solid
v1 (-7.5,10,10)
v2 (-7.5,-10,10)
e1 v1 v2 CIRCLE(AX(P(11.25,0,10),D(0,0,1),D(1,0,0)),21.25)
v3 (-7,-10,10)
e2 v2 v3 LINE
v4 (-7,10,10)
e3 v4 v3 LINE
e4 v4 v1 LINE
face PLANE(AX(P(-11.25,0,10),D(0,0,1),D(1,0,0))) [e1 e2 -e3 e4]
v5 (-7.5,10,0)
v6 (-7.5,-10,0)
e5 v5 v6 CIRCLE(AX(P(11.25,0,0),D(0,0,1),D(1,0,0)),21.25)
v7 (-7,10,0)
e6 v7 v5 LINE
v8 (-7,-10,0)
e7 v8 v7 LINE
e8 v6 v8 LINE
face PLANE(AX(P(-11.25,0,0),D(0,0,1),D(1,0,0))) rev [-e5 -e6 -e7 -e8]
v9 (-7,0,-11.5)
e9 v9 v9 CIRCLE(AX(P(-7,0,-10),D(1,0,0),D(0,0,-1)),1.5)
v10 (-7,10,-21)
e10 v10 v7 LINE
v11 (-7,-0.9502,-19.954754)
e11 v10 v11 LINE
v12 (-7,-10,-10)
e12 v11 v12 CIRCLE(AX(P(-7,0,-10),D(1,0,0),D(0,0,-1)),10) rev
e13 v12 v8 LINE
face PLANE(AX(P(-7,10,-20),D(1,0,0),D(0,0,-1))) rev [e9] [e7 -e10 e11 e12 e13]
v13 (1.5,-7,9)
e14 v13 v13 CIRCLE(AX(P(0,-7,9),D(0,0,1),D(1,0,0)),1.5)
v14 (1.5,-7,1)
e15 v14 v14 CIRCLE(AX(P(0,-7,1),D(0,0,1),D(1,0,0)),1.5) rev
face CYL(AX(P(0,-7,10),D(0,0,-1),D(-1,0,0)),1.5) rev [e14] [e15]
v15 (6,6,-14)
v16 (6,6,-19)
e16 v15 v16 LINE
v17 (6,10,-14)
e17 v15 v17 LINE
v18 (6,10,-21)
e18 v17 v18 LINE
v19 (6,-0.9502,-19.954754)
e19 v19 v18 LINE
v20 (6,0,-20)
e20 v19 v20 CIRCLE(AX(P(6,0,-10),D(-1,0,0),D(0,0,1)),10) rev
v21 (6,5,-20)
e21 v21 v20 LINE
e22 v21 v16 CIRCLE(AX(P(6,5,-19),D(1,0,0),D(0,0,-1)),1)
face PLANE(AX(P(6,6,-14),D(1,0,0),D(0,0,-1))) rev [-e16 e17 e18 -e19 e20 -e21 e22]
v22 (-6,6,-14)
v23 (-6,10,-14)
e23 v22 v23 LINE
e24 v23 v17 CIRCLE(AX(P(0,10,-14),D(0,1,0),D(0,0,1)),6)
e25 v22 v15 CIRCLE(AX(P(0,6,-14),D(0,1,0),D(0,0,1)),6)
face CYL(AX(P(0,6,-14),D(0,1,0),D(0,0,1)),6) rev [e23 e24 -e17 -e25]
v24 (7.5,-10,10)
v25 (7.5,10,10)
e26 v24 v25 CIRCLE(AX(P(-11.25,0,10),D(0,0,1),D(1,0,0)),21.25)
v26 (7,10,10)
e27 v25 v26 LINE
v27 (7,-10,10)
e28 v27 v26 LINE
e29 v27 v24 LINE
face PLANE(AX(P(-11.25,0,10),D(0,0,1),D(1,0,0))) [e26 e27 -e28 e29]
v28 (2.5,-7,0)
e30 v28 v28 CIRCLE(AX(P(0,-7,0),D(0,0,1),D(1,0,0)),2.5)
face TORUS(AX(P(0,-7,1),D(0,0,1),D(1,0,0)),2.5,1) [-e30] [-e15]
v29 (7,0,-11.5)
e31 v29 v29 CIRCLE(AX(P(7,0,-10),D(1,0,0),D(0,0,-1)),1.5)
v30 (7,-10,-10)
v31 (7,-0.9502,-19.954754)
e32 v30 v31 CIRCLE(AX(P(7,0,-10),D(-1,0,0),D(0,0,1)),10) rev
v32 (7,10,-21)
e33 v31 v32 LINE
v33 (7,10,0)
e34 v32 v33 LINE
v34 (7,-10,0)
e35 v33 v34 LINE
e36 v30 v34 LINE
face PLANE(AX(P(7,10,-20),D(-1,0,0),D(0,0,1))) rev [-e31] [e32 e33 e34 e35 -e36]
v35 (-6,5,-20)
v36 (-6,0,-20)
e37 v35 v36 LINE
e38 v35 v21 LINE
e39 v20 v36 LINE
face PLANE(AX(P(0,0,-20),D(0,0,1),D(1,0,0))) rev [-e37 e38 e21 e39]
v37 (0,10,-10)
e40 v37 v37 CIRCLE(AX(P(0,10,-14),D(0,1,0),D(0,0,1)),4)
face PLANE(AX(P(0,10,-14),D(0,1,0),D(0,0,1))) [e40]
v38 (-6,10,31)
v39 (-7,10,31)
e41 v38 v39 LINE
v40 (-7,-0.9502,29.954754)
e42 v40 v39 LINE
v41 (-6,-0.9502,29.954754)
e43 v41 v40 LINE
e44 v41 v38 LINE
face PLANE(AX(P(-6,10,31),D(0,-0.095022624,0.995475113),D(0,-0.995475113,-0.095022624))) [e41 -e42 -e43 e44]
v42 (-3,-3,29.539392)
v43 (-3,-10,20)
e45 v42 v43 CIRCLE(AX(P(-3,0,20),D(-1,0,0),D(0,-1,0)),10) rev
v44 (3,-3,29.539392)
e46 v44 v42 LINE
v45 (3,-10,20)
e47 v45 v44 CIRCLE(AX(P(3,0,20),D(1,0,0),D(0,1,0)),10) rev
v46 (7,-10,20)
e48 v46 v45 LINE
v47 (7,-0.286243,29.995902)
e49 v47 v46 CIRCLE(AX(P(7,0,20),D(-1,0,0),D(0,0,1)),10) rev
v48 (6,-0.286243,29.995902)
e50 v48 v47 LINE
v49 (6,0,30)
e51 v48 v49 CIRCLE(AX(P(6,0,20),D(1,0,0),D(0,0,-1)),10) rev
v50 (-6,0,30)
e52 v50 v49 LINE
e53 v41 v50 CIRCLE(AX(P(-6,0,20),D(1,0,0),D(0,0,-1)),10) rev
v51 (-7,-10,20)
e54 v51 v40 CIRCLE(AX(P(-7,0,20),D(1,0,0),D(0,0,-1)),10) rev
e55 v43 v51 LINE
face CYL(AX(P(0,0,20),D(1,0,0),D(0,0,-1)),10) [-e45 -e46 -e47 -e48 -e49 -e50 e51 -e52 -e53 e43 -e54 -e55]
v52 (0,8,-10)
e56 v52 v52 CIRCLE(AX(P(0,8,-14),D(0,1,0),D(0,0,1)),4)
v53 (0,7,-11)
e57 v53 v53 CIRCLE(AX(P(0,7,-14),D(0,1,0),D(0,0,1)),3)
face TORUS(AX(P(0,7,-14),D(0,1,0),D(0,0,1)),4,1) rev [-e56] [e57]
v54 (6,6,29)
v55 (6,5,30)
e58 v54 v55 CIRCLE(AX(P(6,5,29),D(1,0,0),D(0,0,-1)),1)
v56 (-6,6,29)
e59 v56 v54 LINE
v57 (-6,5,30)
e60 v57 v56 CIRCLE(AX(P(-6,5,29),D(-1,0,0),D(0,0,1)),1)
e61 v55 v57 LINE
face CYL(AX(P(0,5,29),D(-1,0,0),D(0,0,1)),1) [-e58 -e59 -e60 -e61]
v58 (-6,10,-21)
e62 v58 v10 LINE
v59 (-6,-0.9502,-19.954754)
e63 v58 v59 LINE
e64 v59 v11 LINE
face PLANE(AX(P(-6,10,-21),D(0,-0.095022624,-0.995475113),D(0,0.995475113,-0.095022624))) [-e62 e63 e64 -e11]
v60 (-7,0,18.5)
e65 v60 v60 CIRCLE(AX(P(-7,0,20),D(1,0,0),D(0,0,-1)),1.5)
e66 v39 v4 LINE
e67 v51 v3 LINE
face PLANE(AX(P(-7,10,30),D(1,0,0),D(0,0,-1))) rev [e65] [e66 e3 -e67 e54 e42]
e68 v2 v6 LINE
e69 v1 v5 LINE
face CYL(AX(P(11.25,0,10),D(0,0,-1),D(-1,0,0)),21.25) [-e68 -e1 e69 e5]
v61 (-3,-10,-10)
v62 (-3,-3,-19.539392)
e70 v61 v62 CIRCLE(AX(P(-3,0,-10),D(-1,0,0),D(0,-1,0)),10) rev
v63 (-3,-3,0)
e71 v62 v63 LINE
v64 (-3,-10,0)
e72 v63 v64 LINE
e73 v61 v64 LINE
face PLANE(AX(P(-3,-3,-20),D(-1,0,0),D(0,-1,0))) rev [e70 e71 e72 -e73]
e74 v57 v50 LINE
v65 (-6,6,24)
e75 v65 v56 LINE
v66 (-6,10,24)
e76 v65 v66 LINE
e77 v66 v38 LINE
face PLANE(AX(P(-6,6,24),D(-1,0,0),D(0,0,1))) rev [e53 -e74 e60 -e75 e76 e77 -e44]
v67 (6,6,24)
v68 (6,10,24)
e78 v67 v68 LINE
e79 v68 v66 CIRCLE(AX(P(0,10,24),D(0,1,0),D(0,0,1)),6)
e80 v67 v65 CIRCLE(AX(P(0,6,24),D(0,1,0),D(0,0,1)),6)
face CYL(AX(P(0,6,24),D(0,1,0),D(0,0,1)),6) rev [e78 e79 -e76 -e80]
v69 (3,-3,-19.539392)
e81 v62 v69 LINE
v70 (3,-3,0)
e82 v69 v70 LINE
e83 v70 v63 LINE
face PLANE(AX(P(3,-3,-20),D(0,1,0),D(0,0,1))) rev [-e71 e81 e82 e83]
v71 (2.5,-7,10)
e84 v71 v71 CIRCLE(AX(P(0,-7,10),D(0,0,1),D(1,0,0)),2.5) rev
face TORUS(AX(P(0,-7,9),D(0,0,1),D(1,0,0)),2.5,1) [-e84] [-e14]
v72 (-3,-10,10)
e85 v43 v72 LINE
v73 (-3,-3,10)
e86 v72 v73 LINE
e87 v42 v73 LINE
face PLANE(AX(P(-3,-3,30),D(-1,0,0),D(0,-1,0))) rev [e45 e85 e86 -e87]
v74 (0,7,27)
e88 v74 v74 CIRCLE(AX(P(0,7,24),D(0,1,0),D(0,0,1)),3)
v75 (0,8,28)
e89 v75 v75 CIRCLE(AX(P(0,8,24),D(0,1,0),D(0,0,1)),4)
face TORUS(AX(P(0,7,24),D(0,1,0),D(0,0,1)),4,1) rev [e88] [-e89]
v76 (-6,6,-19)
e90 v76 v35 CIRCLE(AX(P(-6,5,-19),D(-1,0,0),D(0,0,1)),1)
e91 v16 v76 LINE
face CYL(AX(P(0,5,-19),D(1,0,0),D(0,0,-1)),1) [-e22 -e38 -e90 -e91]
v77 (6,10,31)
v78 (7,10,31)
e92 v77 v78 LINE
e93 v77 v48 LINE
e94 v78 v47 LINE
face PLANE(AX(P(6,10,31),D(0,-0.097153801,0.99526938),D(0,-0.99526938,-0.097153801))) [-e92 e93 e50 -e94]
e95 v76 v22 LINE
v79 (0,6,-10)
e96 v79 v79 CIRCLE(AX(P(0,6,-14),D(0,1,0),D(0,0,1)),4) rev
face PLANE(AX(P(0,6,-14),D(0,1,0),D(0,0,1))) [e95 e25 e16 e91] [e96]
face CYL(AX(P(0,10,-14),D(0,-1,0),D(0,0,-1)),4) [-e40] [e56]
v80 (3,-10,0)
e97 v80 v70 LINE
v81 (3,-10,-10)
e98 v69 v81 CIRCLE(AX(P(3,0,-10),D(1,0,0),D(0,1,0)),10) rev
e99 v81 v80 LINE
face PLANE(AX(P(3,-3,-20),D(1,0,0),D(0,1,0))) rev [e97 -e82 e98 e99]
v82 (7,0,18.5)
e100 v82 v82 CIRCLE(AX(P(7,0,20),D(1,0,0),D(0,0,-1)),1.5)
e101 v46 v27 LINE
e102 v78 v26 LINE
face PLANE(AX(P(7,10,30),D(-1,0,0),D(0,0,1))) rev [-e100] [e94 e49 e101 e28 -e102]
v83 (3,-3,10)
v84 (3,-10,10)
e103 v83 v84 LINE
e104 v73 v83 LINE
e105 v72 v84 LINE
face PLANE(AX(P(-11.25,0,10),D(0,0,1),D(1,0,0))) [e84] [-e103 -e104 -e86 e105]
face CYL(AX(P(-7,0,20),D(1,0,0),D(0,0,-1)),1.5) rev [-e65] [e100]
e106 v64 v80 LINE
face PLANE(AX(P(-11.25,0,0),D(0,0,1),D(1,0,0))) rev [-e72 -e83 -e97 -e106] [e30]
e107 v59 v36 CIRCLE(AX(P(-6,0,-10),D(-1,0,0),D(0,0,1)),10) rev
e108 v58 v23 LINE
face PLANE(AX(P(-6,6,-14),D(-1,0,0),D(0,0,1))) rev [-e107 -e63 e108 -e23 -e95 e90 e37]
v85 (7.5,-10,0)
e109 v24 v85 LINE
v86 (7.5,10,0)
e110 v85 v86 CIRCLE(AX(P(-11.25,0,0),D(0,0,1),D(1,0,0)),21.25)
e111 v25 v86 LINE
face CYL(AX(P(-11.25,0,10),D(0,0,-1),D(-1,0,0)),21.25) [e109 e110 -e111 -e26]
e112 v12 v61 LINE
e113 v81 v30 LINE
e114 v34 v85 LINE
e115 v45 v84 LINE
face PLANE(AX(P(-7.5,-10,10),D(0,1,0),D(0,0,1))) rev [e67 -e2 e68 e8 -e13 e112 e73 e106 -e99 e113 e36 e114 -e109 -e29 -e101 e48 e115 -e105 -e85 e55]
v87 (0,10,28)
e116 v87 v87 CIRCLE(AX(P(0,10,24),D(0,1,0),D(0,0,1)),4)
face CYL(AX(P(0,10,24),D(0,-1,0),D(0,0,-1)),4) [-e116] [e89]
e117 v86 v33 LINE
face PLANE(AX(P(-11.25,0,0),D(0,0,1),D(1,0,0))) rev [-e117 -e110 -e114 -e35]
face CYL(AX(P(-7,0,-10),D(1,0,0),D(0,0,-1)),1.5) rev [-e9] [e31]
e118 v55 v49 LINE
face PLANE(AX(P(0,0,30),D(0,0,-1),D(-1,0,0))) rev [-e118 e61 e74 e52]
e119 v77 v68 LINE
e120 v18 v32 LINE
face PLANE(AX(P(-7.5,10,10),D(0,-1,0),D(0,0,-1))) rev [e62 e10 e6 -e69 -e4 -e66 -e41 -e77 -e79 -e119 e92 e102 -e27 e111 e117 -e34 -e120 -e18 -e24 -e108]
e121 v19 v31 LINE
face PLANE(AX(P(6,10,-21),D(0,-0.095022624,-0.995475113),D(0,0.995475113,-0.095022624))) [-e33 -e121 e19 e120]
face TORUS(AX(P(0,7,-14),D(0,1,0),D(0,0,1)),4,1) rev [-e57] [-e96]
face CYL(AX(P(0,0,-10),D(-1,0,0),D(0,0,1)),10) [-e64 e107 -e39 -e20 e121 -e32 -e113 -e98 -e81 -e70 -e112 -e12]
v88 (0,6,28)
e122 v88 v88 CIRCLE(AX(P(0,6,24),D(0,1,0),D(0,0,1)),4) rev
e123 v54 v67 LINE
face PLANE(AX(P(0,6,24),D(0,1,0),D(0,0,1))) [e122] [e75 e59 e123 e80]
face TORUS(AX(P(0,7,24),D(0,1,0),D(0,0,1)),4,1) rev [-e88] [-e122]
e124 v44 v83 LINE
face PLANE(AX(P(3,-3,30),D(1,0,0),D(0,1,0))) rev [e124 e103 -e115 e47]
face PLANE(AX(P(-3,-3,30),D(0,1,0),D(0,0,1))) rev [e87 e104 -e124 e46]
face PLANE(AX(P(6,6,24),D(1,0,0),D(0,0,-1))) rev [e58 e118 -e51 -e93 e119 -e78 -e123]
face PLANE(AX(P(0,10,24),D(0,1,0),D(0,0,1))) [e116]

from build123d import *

# Parameters (mm, degrees)
SALIENTE_EXTRUIR1_DEPTH = 10
CROQUIS3_R              = 1.5
CORTAR_EXTRUIR1_DEPTH   = 10
SALIENTE_EXTRUIR2_DEPTH = 20
SALIENTE_EXTRUIR3_DEPTH = 20
CROQUIS6_R              = 1.5
CORTAR_EXTRUIR2_DEPTH   = 14
REDONDEO1_R             = 10
CUT_EXTRUDE1_DEPTH      = 4
SKETCH2_R               = 3
BOSS_EXTRUDE1_DEPTH     = 2
SKETCH3_R               = 4
BOSS_EXTRUDE2_DEPTH     = 2
FILLET1_R               = 1
FILLET2_R               = 1
FILLET3_R               = 1
BOSS_EXTRUDE3_DEPTH     = 1
BOSS_EXTRUDE4_DEPTH     = 1


with BuildPart() as part:
    # Croquis2 → Saliente-Extruir1 (new body)
    with BuildSketch(Plane.XY):
        with BuildLine():
            Line((-7.5, 10), (7.5, 10))
            ThreePointArc((7.5, 10), (10, 0), (7.5, -10))
            Line((7.5, -10), (-7.5, -10))
            ThreePointArc((-7.5, -10), (-10, 0), (-7.5, 10))
        make_face()
    extrude(amount=SALIENTE_EXTRUIR1_DEPTH)

    # Croquis3 → Cortar-Extruir1 (cut)
    with BuildSketch(Plane(origin=(0, 0, 0), x_dir=(-1, 0, 0), z_dir=(0, 0, -1))):
        with Locations((0, -7)):
            Circle(CROQUIS3_R)
    extrude(amount=-CORTAR_EXTRUIR1_DEPTH, mode=Mode.SUBTRACT)

    # Croquis4 → Saliente-Extruir2 (add)
    with BuildSketch(Plane(origin=(0, 0, 0), x_dir=(-1, 0, 0), z_dir=(0, 0, -1))):
        Polygon((-7, 10), (-7, -10), (-3, -10), (-3, -3), (3, -3), (3, -10), (7, -10), (7, 10), align=None)
    extrude(amount=SALIENTE_EXTRUIR2_DEPTH)

    # Croquis5 → Saliente-Extruir3 (add)
    with BuildSketch(Plane.XY.offset(10)):
        Polygon((-7, 10), (-7, -10), (-3, -10), (-3, -3), (3, -3), (3, -10), (7, -10), (7, 10), align=None)
    extrude(amount=SALIENTE_EXTRUIR3_DEPTH)

    # Croquis6 → Cortar-Extruir2 (cut)
    with BuildSketch(Plane(origin=(7, 0, 0), x_dir=(0, 0, -1), z_dir=(1, 0, 0))):
        with Locations((-20, 0)):
            Circle(CROQUIS6_R)
        with Locations((10, 0)):
            Circle(CROQUIS6_R)
    extrude(amount=-CORTAR_EXTRUIR2_DEPTH, mode=Mode.SUBTRACT)

    # Redondeo1
    redondeo1_edges = [part.edges().sort_by_distance(p)[0] for p in [
        (-5, -10, 30),
        (-5, -10, -20),
    ]]
    fillet(redondeo1_edges, radius=REDONDEO1_R)

    # Sketch1 → Cut-Extrude1 (cut)
    with BuildSketch(Plane(origin=(0, 10, 0), x_dir=(1, 0, 0), z_dir=(0, 1, 0))):
        with BuildLine():
            Line((-6, 14), (-6, 20))
            Line((-6, 20), (6, 20))
            Line((6, 20), (6, 14))
            ThreePointArc((6, 14), (0, 8), (-6, 14))
        make_face()
        with BuildLine():
            Line((-6, -24), (-6, -30))
            Line((-6, -30), (6, -30))
            Line((6, -30), (6, -24))
            ThreePointArc((6, -24), (0, -18), (-6, -24))
        make_face()
    extrude(amount=-CUT_EXTRUDE1_DEPTH, mode=Mode.SUBTRACT)

    # Sketch2 → Boss-Extrude1 (add)
    with BuildSketch(Plane(origin=(0, 6, 0), x_dir=(1, 0, 0), z_dir=(0, 1, 0))):
        with Locations(Location((0, 14, 0), (0, 0, 270))):
            Circle(SKETCH2_R)
        with Locations(Location((0, -24, 0), (0, 0, 270))):
            Circle(SKETCH2_R)
    extrude(amount=BOSS_EXTRUDE1_DEPTH)

    # Sketch3 → Boss-Extrude2 (add)
    with BuildSketch(Plane(origin=(0, 8, 0), x_dir=(1, 0, 0), z_dir=(0, 1, 0))):
        with Locations(Location((0, -24, 0), (0, 0, 270))):
            Circle(SKETCH3_R)
        with Locations(Location((0, 14, 0), (0, 0, 270))):
            Circle(SKETCH3_R)
    extrude(amount=BOSS_EXTRUDE2_DEPTH)

    # Fillet1
    fillet1_edges = [part.edges().sort_by_distance(p)[0] for p in [
        (0, 6, -17),
        (0, 8, -17),
        (0, 6, 21),
        (0, 8, 21),
    ]]
    fillet(fillet1_edges, radius=FILLET1_R - 0.0001)  # a hair under: the kernel refuses the full size

    # Fillet2
    fillet2_edges = [part.edges().sort_by_distance(p)[0] for p in [
        (0, 6, -20),
        (0, 6, 30),
    ]]
    fillet(fillet2_edges, radius=FILLET2_R)

    # Fillet3
    fillet3_edges = [part.edges().sort_by_distance(p)[0] for p in [
        (1.5, -7, 10),
        (1.5, -7, 0),
    ]]
    fillet(fillet3_edges, radius=FILLET3_R)

    # Sketch4 → Boss-Extrude3 (add)
    with BuildSketch(Plane(origin=(7, 0, 0), x_dir=(0, 0, -1), z_dir=(1, 0, 0))):
        Polygon((20, 10), (21, 10), (19.95475361, -0.950200281), align=None)
        Polygon((-30, 10), (-31, 10), (-29.862558585, -1.652252452), align=None)
    extrude(amount=-BOSS_EXTRUDE3_DEPTH)

    # Sketch5 → Boss-Extrude4 (add)
    with BuildSketch(Plane.ZY.offset(7)):
        Polygon((30, 10), (31, 10), (29.95475361, -0.950200281), align=None)
        Polygon((-20, 10), (-21, 10), (-19.95475361, -0.950200281), align=None)
    extrude(amount=-BOSS_EXTRUDE4_DEPTH)


solid = part.part
